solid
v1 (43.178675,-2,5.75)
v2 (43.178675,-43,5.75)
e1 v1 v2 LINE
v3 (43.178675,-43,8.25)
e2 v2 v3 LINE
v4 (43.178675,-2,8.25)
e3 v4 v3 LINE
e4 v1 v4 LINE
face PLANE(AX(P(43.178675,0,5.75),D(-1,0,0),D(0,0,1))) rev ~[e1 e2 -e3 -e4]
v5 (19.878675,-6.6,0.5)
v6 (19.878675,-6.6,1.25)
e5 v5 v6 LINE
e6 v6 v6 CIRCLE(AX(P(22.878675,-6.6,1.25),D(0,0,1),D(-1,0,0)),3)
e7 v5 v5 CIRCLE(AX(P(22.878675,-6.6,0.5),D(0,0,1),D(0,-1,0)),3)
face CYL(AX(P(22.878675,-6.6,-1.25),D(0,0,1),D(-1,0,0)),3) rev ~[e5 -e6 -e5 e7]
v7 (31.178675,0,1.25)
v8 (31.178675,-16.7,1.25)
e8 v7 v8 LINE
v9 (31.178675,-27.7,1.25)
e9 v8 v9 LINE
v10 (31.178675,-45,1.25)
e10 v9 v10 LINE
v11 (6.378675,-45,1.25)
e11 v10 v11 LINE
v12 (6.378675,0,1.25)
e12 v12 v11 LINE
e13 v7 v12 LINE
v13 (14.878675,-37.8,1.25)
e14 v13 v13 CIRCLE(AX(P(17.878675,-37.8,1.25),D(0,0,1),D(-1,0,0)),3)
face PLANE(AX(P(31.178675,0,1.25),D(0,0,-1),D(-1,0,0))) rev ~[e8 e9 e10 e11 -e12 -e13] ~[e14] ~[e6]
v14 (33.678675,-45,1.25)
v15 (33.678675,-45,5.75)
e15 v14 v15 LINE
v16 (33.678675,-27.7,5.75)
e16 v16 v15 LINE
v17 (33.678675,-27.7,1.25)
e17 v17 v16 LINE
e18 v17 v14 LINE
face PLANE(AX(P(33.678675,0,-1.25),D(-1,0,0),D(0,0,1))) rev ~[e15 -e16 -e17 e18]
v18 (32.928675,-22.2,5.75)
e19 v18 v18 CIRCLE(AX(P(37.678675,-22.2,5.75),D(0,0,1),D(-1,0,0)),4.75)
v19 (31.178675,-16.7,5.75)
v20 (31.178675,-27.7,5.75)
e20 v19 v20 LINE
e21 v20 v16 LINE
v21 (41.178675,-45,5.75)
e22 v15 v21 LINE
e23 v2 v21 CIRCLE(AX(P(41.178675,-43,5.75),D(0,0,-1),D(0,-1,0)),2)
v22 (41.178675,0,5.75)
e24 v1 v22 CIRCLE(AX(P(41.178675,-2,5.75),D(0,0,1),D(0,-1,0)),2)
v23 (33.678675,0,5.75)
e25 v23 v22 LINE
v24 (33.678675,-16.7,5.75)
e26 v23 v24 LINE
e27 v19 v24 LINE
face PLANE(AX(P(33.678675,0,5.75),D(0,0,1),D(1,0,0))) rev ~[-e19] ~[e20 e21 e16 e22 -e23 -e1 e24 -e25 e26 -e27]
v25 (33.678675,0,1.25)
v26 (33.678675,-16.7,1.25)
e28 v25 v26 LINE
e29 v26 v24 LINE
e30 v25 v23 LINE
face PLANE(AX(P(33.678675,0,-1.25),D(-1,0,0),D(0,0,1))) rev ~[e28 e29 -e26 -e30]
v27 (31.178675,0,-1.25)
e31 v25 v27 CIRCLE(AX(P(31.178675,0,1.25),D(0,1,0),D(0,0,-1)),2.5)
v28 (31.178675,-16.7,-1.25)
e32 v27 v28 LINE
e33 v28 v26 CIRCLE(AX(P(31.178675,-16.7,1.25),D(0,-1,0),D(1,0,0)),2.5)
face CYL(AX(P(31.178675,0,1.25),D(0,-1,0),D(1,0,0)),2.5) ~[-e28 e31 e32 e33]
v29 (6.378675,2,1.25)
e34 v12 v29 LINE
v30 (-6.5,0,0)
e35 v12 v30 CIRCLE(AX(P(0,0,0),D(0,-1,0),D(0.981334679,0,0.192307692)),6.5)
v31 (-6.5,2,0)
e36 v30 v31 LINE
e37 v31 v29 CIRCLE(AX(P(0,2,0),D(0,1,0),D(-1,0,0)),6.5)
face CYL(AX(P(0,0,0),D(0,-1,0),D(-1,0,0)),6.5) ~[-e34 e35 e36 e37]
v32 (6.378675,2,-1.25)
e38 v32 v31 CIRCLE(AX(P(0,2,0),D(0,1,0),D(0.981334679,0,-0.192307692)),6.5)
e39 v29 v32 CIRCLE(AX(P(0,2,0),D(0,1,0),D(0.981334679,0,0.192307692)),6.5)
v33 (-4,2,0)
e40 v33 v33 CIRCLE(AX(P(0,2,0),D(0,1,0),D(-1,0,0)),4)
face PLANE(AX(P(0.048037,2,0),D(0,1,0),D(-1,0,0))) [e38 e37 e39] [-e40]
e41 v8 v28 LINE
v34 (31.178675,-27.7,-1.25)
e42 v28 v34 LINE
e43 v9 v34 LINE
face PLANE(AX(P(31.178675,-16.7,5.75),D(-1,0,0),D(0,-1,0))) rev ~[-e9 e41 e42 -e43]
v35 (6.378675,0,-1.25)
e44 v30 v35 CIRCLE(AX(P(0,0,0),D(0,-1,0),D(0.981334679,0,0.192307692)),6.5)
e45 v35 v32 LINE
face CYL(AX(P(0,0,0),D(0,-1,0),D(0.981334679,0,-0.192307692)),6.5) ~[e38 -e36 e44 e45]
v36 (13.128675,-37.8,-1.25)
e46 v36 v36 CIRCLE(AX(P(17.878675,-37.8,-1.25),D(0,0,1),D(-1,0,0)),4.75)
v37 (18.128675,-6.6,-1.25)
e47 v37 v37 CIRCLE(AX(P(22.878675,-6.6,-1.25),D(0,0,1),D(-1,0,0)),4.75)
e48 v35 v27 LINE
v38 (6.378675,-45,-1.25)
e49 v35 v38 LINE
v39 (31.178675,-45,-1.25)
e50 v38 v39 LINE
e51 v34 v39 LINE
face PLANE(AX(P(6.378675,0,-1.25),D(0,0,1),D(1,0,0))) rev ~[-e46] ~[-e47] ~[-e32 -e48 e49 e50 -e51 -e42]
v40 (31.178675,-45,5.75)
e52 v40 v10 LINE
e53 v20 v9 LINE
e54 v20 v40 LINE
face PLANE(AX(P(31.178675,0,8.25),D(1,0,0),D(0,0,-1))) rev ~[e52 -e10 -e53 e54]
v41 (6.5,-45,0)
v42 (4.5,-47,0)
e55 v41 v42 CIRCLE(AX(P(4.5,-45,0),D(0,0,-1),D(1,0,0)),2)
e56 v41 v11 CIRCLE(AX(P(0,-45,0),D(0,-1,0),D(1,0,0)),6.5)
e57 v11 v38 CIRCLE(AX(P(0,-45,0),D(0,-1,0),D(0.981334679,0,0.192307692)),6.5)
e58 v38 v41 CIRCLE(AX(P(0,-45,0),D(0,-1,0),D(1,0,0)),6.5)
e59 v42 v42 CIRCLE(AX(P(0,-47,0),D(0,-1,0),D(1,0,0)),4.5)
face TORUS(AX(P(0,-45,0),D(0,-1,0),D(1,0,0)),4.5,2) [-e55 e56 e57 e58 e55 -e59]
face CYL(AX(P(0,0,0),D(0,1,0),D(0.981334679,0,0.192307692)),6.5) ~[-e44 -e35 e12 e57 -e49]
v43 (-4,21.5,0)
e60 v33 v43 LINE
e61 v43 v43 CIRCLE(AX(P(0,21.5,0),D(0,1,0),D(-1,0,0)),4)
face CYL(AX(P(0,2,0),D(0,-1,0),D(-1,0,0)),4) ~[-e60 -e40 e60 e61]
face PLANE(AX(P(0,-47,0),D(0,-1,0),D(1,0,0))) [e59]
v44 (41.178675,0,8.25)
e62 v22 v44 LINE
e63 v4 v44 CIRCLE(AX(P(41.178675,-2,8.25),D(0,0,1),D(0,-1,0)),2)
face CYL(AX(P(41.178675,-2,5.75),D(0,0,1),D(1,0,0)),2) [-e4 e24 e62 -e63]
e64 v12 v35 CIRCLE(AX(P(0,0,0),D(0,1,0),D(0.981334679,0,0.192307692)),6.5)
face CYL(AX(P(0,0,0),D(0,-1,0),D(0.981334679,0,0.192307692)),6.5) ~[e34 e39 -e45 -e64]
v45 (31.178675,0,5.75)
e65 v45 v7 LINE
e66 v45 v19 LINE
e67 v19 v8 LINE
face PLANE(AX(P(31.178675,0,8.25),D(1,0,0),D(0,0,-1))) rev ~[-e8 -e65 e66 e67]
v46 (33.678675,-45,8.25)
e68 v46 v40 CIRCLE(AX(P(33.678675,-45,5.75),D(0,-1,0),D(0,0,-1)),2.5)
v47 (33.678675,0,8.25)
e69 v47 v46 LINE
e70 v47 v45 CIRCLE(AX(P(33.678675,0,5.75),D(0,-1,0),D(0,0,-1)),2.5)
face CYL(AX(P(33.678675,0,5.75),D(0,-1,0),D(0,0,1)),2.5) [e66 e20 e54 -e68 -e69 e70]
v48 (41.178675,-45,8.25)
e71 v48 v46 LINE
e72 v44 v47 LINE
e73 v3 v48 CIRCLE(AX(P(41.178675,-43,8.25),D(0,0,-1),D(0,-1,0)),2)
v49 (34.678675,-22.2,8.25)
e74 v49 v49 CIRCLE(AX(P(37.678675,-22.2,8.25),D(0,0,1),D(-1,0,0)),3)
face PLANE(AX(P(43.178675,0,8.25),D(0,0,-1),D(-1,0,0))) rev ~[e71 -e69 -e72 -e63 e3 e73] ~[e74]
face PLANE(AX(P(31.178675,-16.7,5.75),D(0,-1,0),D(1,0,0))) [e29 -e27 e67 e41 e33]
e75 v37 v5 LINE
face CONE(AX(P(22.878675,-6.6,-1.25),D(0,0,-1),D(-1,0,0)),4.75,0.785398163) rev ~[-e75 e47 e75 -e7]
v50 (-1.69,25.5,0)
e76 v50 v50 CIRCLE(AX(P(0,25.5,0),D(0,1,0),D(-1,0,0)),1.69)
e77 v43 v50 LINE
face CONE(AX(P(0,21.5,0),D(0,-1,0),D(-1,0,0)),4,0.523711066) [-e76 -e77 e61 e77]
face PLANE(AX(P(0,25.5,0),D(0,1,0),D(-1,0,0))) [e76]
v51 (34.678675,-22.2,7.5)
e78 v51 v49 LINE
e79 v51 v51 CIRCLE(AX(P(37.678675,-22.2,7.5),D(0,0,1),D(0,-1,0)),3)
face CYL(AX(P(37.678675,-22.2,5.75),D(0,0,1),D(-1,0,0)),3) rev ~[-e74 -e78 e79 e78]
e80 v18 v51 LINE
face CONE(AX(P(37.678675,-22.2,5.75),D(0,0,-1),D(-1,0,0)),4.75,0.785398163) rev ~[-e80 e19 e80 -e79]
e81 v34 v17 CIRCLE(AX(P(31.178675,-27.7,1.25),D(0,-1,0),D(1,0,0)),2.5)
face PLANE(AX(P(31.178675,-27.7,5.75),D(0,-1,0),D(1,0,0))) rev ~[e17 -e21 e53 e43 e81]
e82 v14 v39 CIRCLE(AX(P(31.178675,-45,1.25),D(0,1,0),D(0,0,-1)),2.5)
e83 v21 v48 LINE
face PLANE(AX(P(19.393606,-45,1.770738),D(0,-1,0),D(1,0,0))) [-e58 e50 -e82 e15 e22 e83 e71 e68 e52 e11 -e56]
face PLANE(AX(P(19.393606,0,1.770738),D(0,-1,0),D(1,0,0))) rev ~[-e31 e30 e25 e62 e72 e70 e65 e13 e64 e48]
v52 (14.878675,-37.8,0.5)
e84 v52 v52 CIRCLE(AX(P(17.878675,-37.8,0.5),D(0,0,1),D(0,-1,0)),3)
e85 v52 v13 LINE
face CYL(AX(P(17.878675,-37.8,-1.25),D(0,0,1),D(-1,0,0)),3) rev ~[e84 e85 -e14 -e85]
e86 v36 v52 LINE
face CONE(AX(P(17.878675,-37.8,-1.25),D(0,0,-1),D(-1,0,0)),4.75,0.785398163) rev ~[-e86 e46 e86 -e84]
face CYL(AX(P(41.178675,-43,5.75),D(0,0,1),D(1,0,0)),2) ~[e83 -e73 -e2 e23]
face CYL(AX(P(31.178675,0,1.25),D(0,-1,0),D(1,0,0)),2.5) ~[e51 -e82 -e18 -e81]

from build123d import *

# Parameters (mm, degrees)
F1_DEPTH        = 45
F2_R            = 2
F3_R            = 2.5
F5_DEPTH        = 2
F6_R            = 4
F7_DEPTH        = 23.5
F8_SIZE2        = 2.31
F8_SIZE         = 4
F10_D           = 6
F10_CSINK_D     = 9.5
F10_CSINK_ANGLE = 90
F11_R           = 6.5
F12_DEPTH       = 2
F14_W           = 5
F14_H           = 11
F15_DEPTH       = 25
F16_D           = 6
F16_CSINK_D     = 9.5
F16_CSINK_ANGLE = 90


# Not quite as in the source:
# - a fillet or chamfer that OpenCascade refuses, or shapes differently, is made with other operations: its cross-section is extruded or revolved along the edge and cut away or added
# - a feature names something its author has since deleted; it is built from what else it names


with BuildPart() as f1:
    # F0 (on Front) → F1 (new body)
    with BuildSketch(Plane.XZ):
        with BuildLine():
            Line((31.1786754111, 1.25), (6.3786754111, 1.25))
            ThreePointArc((6.3786754111, 1.25), (-6.5, 0), (6.3786754111, -1.25))
            Line((6.3786754111, -1.25), (33.6786754111, -1.25))
            Line((33.6786754111, -1.25), (33.6786754111, 5.75))
            Line((33.6786754111, 5.75), (43.1786754111, 5.75))
            Line((43.1786754111, 5.75), (43.1786754111, 8.25))
            Line((43.1786754111, 8.25), (31.1786754111, 8.25))
            Line((31.1786754111, 8.25), (31.1786754111, 1.25))
        make_face()
    extrude(amount=F1_DEPTH)

    # F2
    f2_edges = [f1.edges().sort_by_distance(p)[0] for p in [
        (43.178675, -45, 7),
        (43.178675, 0, 7),
    ]]
    fillet(f2_edges, radius=F2_R)

    # F3
    f3_edges = [f1.edges().sort_by_distance(p)[0] for p in [
        (33.678675, -22.5, -1.25),
        (31.178675, -22.5, 8.25),
    ]]
    fillet(f3_edges, radius=F3_R)

    # F4 (on face) → F5 (join)
    with BuildSketch(Plane(origin=(0, 0, 0), x_dir=(-1, 0, 0), z_dir=(0, 1, 0))):
        with BuildLine():
            ThreePointArc((-6.3786754111, -1.25), (0.6279370303, -6.469597753), (6.5, 0))
            ThreePointArc((6.5, 0), (0.6279370303, 6.469597753), (-6.3786754111, 1.25))
            ThreePointArc((-6.3786754111, 1.25), (-6.5, 0), (-6.3786754111, -1.25))
        make_face()
    extrude(amount=F5_DEPTH)

    # F6 (on face) → F7 (join)
    with BuildSketch(Plane(origin=(0, 2, 0), x_dir=(-1, 0, 0), z_dir=(0, 1, 0))):
        Circle(F6_R)
    extrude(amount=F7_DEPTH)

    # F8
    f8_edges = [f1.edges().sort_by_distance(p)[0] for p in [
        (4, 25.5, 0),
    ]]
    f8_side = f1.faces().sort_by_distance((4, 13.75, 0))[0]
    chamfer(f8_edges, length=F8_SIZE, length2=F8_SIZE2, reference=f8_side)

    # F10 (through all)
    with Locations(Plane(origin=(0, 0, -1.25), x_dir=(1, 0, 0), z_dir=(0, 0, -1))):
        with Locations((22.8786754111, 6.6), (17.8786754111, 37.8)):
            CounterSinkHole(F10_D / 2, F10_CSINK_D / 2, counter_sink_angle=F10_CSINK_ANGLE)

    # F11 (on face) → F12 (join)
    with BuildSketch(Plane.XZ.offset(45)):
        Circle(F11_R)
    extrude(amount=F12_DEPTH)

    # F13: fillet of radius 2 on 1 edges, made by hand

    # F13_s1 → F13_t2 (revolve, cut)
    with BuildSketch(Plane.XY):
        with BuildLine():
            ThreePointArc((6.5, -45), (5.9142135624, -46.4142135624), (4.5, -47))
            Line((4.5, -47), (6.5, -47))
            Line((6.5, -47), (6.5, -45))
        make_face()
    revolve(axis=Axis((0, -47, 0), (0, -1, 0)), mode=Mode.SUBTRACT)

    # F14 (on face) → F15 (cut)
    with BuildSketch(Plane(origin=(0, 0, 5.75), x_dir=(1, 0, 0), z_dir=(0, 0, -1))):
        with Locations((33.6786754111, 22.2)):
            Rectangle(F14_W, F14_H)
    extrude(amount=F15_DEPTH, mode=Mode.SUBTRACT)

    # F16 (through all)
    with Locations(Plane(origin=(0, 0, 5.75), x_dir=(1, 0, 0), z_dir=(0, 0, -1))):
        with Locations((37.6786754111, 22.2)):
            CounterSinkHole(F16_D / 2, F16_CSINK_D / 2, counter_sink_angle=F16_CSINK_ANGLE)


solid = f1.part
